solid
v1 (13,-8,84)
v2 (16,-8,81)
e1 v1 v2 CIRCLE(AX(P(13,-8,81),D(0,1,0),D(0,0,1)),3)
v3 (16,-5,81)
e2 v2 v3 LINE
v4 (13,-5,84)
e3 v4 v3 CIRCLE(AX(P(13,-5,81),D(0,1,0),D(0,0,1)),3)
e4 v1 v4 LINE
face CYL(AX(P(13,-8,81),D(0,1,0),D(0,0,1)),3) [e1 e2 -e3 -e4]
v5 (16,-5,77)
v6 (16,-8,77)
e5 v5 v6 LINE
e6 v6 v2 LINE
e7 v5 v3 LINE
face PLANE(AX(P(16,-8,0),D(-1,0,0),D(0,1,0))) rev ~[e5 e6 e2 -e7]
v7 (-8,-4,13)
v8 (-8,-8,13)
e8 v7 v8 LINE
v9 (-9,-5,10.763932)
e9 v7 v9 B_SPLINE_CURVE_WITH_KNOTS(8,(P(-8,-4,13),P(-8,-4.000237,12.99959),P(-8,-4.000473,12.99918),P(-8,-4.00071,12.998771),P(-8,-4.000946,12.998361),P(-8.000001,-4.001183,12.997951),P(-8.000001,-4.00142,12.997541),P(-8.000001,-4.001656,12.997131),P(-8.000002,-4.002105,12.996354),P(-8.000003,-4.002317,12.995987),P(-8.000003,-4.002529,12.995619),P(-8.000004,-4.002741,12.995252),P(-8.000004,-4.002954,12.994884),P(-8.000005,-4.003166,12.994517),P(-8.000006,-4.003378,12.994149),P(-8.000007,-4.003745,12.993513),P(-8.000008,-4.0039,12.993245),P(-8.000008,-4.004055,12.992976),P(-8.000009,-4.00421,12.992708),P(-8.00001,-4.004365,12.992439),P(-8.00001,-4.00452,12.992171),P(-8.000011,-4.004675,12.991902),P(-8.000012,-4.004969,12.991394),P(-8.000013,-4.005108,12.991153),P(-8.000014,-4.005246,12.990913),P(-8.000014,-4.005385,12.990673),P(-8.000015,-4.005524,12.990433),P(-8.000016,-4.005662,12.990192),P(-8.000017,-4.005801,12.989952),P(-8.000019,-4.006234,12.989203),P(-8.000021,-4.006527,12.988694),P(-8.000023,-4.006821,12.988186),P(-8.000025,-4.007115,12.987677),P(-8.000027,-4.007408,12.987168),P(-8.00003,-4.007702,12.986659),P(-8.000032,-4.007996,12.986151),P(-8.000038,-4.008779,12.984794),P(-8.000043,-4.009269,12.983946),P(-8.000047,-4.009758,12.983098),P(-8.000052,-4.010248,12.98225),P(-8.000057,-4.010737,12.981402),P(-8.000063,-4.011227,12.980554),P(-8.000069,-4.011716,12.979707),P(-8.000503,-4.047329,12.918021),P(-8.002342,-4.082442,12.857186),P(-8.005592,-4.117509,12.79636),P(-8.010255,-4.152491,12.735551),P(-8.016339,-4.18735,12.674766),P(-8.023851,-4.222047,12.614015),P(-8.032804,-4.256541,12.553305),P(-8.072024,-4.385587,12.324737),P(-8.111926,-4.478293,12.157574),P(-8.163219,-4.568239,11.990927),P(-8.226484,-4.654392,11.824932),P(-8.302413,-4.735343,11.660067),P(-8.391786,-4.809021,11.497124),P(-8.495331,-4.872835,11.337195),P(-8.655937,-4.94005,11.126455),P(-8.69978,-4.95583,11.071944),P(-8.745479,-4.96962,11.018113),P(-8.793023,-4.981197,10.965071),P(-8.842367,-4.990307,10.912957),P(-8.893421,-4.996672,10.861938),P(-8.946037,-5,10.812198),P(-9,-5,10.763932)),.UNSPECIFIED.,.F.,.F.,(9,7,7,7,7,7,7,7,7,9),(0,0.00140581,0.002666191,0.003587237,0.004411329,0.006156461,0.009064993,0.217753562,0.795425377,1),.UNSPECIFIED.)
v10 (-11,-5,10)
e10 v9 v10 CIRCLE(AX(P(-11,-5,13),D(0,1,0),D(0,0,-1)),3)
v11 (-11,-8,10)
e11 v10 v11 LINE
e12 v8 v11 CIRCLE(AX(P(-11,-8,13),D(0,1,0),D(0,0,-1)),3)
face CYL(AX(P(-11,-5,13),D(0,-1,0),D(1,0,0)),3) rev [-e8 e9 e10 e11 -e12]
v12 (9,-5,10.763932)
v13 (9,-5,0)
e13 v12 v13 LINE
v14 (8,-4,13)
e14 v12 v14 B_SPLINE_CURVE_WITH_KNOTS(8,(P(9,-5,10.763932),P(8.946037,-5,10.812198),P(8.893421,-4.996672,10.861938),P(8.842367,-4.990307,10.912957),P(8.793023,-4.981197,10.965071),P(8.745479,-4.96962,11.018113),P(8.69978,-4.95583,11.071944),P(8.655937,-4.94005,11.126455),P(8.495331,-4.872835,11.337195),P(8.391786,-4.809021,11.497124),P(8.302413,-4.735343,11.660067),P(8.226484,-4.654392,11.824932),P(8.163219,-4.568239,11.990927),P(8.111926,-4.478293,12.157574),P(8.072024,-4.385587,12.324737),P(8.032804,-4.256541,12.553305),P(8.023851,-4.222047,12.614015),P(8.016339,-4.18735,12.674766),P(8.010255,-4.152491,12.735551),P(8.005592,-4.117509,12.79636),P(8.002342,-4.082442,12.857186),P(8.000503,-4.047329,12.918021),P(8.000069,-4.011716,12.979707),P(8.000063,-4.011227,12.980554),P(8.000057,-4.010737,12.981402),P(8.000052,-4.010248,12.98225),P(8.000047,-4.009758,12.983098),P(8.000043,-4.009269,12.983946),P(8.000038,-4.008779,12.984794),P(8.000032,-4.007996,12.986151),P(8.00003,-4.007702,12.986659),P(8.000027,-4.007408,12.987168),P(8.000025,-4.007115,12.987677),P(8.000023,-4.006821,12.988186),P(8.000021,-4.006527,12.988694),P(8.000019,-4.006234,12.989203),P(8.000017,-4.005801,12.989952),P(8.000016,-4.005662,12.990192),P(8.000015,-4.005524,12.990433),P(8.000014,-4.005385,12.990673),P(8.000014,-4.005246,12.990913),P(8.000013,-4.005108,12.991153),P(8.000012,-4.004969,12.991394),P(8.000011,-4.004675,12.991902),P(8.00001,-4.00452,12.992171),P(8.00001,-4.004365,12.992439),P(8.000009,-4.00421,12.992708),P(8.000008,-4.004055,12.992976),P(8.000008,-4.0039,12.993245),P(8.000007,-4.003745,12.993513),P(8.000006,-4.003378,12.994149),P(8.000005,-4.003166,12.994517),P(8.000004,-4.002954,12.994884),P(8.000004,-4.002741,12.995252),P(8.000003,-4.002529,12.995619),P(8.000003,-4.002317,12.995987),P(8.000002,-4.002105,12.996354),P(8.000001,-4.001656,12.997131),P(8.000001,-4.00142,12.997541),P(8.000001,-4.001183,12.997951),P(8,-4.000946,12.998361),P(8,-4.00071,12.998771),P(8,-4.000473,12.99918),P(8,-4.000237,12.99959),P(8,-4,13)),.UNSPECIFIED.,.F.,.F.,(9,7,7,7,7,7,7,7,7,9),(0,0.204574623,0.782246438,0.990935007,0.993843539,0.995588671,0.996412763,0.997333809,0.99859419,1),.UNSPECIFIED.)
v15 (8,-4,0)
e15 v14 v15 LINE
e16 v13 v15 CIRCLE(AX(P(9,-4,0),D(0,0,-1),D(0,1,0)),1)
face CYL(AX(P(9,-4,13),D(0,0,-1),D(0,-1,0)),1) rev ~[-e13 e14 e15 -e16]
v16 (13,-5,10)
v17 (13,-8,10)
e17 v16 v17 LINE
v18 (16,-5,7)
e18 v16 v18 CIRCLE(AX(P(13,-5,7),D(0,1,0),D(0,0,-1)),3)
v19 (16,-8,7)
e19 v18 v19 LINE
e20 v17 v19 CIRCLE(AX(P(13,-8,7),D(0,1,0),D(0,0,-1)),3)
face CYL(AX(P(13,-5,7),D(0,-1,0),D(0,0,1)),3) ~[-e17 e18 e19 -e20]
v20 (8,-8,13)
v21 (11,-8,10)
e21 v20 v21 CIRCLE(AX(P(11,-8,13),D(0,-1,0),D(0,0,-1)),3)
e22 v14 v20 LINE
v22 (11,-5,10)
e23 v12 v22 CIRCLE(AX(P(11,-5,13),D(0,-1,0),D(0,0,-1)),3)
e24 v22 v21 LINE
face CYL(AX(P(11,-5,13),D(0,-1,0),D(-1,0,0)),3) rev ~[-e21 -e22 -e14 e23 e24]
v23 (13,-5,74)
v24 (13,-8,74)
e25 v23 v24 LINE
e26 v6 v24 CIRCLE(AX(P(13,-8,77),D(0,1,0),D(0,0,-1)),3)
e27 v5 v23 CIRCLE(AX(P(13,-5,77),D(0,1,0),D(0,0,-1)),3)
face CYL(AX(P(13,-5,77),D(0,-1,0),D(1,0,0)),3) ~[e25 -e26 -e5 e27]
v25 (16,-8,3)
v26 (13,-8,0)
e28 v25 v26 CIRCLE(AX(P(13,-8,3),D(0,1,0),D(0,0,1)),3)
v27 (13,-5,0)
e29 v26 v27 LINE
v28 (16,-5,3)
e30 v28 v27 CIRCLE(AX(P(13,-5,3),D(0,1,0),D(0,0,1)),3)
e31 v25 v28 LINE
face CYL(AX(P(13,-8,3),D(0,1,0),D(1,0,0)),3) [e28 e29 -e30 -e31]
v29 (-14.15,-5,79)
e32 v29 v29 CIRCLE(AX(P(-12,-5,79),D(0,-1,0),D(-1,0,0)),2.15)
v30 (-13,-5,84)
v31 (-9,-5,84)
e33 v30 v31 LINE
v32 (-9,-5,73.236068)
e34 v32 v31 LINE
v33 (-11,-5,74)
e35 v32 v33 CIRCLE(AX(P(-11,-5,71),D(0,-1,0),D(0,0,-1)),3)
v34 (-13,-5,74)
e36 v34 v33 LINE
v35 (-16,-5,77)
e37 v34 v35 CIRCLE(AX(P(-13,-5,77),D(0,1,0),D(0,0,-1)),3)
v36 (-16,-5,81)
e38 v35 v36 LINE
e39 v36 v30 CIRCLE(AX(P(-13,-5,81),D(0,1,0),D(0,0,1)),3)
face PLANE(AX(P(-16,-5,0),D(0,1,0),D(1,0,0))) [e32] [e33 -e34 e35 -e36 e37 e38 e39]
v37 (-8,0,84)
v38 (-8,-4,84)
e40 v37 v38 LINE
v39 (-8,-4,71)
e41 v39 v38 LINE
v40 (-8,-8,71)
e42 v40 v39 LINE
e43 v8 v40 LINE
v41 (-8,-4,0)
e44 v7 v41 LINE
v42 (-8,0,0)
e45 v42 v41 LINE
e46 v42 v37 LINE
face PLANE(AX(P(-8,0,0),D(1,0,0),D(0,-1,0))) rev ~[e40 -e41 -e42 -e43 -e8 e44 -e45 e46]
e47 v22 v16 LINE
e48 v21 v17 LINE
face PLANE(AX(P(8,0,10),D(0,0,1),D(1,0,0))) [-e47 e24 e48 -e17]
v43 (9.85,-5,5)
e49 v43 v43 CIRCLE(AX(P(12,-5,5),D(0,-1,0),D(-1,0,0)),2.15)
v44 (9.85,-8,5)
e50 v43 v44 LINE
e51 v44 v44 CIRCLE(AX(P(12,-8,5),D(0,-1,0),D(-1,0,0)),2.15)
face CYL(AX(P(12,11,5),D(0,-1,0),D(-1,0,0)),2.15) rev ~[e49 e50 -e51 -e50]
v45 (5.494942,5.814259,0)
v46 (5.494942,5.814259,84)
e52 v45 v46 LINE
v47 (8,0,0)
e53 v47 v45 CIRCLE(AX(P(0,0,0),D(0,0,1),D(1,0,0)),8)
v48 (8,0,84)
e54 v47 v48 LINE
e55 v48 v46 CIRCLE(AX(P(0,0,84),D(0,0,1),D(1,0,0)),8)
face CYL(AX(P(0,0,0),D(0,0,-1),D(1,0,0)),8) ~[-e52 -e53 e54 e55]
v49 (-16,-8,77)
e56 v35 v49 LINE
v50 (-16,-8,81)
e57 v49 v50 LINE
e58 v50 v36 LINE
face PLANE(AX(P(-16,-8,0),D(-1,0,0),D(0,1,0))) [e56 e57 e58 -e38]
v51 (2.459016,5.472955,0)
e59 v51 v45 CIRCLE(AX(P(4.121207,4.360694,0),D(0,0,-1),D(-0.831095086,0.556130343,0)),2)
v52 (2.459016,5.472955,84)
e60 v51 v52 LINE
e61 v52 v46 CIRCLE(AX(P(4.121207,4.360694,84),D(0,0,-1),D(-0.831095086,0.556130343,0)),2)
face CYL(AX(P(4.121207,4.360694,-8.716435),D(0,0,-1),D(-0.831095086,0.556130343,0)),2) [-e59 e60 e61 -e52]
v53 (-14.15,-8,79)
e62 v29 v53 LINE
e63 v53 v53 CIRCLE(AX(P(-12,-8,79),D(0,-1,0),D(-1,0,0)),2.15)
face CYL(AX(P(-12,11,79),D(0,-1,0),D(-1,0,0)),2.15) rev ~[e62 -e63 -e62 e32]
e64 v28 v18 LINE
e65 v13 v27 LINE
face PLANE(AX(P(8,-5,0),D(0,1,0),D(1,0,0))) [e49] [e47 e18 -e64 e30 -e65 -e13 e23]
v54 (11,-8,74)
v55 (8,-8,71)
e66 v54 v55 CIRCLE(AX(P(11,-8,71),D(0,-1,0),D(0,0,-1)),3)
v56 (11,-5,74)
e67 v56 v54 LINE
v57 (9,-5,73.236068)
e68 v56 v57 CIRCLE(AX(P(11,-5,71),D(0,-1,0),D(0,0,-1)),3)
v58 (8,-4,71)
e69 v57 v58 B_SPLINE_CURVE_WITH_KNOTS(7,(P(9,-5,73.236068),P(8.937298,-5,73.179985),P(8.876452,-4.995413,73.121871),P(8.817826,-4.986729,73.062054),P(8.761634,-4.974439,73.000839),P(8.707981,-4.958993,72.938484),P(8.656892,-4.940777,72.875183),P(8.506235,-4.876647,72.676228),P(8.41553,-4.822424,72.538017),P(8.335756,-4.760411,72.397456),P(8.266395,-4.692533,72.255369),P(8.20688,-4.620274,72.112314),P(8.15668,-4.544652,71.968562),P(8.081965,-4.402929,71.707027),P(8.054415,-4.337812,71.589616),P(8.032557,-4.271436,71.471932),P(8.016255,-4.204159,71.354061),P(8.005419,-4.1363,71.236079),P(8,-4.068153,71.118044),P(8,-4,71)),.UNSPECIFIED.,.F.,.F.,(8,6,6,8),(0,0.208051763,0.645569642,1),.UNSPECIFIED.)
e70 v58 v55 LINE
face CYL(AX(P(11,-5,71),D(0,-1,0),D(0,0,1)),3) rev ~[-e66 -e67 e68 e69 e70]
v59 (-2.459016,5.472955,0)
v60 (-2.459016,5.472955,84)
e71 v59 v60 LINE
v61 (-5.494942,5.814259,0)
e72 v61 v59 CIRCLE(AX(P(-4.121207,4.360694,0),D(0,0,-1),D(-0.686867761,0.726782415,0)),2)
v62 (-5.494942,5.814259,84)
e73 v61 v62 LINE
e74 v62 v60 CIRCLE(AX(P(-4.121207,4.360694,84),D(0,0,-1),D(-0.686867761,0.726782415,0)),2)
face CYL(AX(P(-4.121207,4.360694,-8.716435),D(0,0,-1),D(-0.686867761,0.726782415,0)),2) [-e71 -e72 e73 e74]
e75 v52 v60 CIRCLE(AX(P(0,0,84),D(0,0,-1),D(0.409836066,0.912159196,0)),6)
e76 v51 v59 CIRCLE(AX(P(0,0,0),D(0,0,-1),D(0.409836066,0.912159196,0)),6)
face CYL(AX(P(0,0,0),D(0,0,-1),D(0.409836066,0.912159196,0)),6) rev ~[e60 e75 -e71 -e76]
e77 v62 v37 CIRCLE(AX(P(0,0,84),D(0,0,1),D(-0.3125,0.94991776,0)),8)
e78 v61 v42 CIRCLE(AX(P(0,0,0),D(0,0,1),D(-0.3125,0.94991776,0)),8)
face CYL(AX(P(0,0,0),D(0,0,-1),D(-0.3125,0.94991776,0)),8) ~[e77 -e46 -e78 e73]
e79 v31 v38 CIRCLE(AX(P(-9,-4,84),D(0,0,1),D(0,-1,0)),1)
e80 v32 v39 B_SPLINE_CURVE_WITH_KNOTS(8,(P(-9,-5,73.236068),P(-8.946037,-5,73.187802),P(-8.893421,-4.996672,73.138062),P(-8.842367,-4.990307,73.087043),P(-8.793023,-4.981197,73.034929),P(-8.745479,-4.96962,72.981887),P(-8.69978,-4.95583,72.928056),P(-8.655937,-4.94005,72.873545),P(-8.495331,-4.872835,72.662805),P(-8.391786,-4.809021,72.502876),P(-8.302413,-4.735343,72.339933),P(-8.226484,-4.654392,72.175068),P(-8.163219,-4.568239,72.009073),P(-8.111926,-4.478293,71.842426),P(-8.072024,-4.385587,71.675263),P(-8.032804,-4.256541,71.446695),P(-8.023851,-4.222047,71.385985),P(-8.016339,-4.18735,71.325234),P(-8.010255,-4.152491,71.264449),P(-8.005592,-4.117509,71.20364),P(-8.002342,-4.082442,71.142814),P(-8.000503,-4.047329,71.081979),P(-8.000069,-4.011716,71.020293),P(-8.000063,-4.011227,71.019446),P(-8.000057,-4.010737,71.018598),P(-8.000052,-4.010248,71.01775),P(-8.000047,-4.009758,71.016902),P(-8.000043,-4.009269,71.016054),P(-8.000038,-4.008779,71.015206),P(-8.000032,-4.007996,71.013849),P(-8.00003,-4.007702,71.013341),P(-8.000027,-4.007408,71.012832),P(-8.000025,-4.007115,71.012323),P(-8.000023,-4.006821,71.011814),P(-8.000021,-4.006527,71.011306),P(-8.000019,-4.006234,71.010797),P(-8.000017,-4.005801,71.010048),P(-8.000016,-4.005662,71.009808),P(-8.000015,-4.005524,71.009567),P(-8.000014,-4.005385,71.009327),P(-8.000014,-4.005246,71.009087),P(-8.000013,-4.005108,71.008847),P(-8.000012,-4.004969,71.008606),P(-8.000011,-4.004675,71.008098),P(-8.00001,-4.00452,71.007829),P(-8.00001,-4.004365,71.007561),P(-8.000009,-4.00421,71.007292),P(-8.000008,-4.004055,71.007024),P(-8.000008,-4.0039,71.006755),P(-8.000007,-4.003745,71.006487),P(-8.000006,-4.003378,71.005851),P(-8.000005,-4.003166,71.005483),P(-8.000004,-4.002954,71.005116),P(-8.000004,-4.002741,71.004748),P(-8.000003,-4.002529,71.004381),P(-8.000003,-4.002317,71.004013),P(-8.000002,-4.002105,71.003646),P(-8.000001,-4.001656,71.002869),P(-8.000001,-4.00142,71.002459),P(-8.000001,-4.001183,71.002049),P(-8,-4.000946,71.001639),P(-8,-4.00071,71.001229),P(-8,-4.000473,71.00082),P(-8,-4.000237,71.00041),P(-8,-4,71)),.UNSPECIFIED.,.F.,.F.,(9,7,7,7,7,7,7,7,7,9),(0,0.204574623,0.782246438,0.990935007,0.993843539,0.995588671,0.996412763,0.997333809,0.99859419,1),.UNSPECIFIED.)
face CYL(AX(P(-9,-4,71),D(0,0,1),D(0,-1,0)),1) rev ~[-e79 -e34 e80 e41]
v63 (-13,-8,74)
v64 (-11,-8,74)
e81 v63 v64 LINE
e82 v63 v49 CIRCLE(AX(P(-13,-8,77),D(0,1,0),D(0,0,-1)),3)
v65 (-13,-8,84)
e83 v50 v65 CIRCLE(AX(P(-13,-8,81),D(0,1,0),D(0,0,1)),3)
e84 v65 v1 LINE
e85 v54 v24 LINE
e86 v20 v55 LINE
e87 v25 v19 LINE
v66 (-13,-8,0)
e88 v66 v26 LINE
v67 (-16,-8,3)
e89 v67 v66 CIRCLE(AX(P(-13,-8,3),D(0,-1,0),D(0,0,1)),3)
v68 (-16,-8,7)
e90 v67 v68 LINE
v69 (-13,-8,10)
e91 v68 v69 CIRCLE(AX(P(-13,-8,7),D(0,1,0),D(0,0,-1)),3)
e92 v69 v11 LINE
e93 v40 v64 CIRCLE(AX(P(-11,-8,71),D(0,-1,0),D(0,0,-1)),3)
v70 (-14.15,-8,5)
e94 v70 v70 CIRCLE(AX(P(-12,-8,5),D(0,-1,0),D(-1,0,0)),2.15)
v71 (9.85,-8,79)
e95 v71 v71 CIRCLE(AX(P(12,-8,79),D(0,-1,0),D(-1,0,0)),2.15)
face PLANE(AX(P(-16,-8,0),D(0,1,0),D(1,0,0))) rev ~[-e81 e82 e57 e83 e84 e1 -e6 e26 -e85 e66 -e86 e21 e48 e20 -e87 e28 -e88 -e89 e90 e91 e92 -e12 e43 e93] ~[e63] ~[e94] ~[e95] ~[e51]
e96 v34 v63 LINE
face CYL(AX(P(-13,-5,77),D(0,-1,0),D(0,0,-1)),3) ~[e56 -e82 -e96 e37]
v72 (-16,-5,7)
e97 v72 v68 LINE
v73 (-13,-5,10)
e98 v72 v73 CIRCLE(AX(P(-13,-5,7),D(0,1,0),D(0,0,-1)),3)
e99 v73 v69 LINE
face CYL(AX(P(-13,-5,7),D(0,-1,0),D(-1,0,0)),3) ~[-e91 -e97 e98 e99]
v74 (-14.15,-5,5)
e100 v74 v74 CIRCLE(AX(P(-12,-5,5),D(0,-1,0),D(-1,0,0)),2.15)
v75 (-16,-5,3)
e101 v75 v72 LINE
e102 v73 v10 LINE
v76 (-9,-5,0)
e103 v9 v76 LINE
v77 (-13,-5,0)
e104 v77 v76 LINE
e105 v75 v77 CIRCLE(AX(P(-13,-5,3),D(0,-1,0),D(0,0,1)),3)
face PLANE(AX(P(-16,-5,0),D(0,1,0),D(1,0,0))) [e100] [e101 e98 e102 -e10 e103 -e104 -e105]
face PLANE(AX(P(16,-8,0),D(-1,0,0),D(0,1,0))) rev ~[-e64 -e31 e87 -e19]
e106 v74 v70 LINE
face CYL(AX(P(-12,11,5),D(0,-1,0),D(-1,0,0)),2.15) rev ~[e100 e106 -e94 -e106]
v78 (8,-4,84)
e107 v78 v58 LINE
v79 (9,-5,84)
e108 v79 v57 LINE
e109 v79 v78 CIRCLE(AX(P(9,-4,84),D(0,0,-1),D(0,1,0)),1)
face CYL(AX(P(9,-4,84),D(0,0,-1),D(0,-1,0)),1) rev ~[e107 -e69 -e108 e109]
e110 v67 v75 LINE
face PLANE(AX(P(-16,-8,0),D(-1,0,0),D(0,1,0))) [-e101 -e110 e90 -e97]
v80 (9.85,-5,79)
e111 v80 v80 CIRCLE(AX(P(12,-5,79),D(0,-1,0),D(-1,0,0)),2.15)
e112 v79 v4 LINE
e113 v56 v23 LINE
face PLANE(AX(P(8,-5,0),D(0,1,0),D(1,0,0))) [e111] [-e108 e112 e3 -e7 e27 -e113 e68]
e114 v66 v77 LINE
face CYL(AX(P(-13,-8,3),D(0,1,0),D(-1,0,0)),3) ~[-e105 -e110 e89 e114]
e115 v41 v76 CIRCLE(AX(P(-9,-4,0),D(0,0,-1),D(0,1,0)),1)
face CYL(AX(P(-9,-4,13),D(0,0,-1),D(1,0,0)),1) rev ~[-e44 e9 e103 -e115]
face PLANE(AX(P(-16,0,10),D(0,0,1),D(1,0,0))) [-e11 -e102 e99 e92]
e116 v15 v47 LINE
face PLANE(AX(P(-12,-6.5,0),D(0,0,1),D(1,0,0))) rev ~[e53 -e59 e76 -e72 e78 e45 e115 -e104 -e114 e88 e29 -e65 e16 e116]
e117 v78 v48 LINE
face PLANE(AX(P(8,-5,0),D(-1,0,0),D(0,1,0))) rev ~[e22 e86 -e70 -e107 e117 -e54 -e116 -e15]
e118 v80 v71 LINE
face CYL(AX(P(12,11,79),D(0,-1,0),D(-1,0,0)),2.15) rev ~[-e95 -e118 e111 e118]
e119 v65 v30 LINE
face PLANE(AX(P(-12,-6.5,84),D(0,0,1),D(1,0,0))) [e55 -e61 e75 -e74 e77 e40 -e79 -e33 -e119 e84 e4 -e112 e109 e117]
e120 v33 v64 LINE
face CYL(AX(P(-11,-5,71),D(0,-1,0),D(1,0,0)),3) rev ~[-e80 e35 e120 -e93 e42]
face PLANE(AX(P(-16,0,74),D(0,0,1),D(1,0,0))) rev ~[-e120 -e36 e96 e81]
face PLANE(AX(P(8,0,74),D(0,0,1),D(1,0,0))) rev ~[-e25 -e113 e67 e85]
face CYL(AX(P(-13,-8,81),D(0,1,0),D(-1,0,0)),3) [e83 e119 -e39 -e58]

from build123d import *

# Parameters (mm, degrees)
F0_W        = 8
F0_H        = 3
F1_DEPTH    = 84
F3_D        = 4.3
F3_DEPTH    = 16
F3_START    = 5
F3_TIP      = 1.2918503309
F2_W        = 8
F2_H        = 64
F4_DEPTH    = 25
F5_R        = 3
F6_R        = 1
F7_T1_DEPTH = 101.4328702047


# Not quite as in the source:
# - a fillet or chamfer that OpenCascade refuses, or shapes differently, is made with other operations: its cross-section is extruded or revolved along the edge and cut away or added


with BuildPart() as f1:
    # F0 (on Top) → F1 (new body)
    with BuildSketch(Plane.XY):
        with Locations((-12, -6.5)):
            Rectangle(F0_W, F0_H)
        with BuildLine():
            ThreePointArc((0, -8), (-5.6568542495, -5.6568542495), (-8, 0))
            Line((-8, 0), (-8, -5))
            Line((-8, -5), (-8, -8))
            Line((-8, -8), (-2.5, -8))
            Line((-2.5, -8), (0, -8))
        make_face()
        with BuildLine():
            ThreePointArc((2.4590163934, 5.4729551777), (0, -6), (-2.4590163934, 5.4729551777))
            Line((-2.4590163934, 5.4729551777), (-2.5, 7.5993420768))
            ThreePointArc((-2.5, 7.5993420768), (-6.4807406984, 4.6904157598), (-8, 0))
            ThreePointArc((-8, 0), (-5.6568542495, -5.6568542495), (0, -8))
            ThreePointArc((0, -8), (5.6568542495, -5.6568542495), (8, 0))
            ThreePointArc((8, 0), (6.4807406984, 4.6904157598), (2.5, 7.5993420768))
            Line((2.5, 7.5993420768), (2.4590163934, 5.4729551777))
        make_face()
        with BuildLine():
            Line((8, -5), (8, 0))
            ThreePointArc((8, 0), (5.6568542495, -5.6568542495), (0, -8))
            Line((0, -8), (2.5, -8))
            Line((2.5, -8), (8, -8))
            Line((8, -8), (8, -5))
        make_face()
        with Locations((12, -6.5)):
            Rectangle(F0_W, F0_H)
    extrude(amount=F1_DEPTH)

    # F3
    # its depths count from where the whole tool has entered the part; down to there all is cleared
    with Locations(Plane(origin=(0, 0, 0), x_dir=(1, 0, 0), z_dir=(0, 1, 0)).offset(-F3_START)):
        with Locations((12, -5), (-12, -5), (12, -79), (-12, -79)):
            Hole(F3_D / 2, depth=F3_DEPTH)
            with Locations((0, 0, -(F3_DEPTH + F3_TIP / 2))):  # 118° drill point
                Cone(0, F3_D / 2, F3_TIP, mode=Mode.SUBTRACT)

    # F2 (on Front) → F4 (cut)
    with BuildSketch(Plane.XZ):
        with Locations((12, 42)):
            Rectangle(F2_W, F2_H)
        with Locations((-12, 42)):
            Rectangle(F2_W, F2_H)
    extrude(amount=F4_DEPTH, mode=Mode.SUBTRACT)

    # F5
    f5_edges = [f1.edges().sort_by_distance(p)[0] for p in [
        (-16, -6.5, 84),
        (-16, -6.5, 74),
        (16, -6.5, 84),
        (16, -6.5, 74),
        (-16, -6.5, 0),
        (16, -6.5, 0),
        (16, -6.5, 10),
        (-16, -6.5, 10),
        (-8, -6.5, 10),
        (8, -6.5, 10),
        (-8, -6.5, 74),
        (8, -6.5, 74),
    ]]
    fillet(f5_edges, radius=F5_R)

    # F6
    f6_edges = [f1.edges().sort_by_distance(p)[0] for p in [
        (-8, -5, 5),
        (8, -5, 5),
        (8, -5, 79),
        (-8, -5, 79),
    ]]
    fillet(f6_edges, radius=F6_R)

    # F7: fillet of radius 2 on 2 edges, made by hand

    # F7_s2 → F7_t1 (cut)
    with BuildSketch(Plane.XY.offset(-8.7164351024)):
        with BuildLine():
            ThreePointArc((2.4590163934, 5.4729551777), (3.8977705539, 6.3481743906), (5.4949420866, 5.8142593221))
            ThreePointArc((5.4949420866, 5.8142593221), (4.0959009817, 6.8719426036), (2.5, 7.5993420768))
            Line((2.5, 7.5993420768), (2.4590163934, 5.4729551777))
        make_face()
        with BuildLine():
            ThreePointArc((-5.4949420866, 5.8142593221), (-3.8977705539, 6.3481743906), (-2.4590163934, 5.4729551777))
            Line((-2.4590163934, 5.4729551777), (-2.5, 7.5993420768))
            ThreePointArc((-2.5, 7.5993420768), (-4.0959009817, 6.8719426036), (-5.4949420866, 5.8142593221))
        make_face()
    extrude(amount=F7_T1_DEPTH, mode=Mode.SUBTRACT)


solid = f1.part
